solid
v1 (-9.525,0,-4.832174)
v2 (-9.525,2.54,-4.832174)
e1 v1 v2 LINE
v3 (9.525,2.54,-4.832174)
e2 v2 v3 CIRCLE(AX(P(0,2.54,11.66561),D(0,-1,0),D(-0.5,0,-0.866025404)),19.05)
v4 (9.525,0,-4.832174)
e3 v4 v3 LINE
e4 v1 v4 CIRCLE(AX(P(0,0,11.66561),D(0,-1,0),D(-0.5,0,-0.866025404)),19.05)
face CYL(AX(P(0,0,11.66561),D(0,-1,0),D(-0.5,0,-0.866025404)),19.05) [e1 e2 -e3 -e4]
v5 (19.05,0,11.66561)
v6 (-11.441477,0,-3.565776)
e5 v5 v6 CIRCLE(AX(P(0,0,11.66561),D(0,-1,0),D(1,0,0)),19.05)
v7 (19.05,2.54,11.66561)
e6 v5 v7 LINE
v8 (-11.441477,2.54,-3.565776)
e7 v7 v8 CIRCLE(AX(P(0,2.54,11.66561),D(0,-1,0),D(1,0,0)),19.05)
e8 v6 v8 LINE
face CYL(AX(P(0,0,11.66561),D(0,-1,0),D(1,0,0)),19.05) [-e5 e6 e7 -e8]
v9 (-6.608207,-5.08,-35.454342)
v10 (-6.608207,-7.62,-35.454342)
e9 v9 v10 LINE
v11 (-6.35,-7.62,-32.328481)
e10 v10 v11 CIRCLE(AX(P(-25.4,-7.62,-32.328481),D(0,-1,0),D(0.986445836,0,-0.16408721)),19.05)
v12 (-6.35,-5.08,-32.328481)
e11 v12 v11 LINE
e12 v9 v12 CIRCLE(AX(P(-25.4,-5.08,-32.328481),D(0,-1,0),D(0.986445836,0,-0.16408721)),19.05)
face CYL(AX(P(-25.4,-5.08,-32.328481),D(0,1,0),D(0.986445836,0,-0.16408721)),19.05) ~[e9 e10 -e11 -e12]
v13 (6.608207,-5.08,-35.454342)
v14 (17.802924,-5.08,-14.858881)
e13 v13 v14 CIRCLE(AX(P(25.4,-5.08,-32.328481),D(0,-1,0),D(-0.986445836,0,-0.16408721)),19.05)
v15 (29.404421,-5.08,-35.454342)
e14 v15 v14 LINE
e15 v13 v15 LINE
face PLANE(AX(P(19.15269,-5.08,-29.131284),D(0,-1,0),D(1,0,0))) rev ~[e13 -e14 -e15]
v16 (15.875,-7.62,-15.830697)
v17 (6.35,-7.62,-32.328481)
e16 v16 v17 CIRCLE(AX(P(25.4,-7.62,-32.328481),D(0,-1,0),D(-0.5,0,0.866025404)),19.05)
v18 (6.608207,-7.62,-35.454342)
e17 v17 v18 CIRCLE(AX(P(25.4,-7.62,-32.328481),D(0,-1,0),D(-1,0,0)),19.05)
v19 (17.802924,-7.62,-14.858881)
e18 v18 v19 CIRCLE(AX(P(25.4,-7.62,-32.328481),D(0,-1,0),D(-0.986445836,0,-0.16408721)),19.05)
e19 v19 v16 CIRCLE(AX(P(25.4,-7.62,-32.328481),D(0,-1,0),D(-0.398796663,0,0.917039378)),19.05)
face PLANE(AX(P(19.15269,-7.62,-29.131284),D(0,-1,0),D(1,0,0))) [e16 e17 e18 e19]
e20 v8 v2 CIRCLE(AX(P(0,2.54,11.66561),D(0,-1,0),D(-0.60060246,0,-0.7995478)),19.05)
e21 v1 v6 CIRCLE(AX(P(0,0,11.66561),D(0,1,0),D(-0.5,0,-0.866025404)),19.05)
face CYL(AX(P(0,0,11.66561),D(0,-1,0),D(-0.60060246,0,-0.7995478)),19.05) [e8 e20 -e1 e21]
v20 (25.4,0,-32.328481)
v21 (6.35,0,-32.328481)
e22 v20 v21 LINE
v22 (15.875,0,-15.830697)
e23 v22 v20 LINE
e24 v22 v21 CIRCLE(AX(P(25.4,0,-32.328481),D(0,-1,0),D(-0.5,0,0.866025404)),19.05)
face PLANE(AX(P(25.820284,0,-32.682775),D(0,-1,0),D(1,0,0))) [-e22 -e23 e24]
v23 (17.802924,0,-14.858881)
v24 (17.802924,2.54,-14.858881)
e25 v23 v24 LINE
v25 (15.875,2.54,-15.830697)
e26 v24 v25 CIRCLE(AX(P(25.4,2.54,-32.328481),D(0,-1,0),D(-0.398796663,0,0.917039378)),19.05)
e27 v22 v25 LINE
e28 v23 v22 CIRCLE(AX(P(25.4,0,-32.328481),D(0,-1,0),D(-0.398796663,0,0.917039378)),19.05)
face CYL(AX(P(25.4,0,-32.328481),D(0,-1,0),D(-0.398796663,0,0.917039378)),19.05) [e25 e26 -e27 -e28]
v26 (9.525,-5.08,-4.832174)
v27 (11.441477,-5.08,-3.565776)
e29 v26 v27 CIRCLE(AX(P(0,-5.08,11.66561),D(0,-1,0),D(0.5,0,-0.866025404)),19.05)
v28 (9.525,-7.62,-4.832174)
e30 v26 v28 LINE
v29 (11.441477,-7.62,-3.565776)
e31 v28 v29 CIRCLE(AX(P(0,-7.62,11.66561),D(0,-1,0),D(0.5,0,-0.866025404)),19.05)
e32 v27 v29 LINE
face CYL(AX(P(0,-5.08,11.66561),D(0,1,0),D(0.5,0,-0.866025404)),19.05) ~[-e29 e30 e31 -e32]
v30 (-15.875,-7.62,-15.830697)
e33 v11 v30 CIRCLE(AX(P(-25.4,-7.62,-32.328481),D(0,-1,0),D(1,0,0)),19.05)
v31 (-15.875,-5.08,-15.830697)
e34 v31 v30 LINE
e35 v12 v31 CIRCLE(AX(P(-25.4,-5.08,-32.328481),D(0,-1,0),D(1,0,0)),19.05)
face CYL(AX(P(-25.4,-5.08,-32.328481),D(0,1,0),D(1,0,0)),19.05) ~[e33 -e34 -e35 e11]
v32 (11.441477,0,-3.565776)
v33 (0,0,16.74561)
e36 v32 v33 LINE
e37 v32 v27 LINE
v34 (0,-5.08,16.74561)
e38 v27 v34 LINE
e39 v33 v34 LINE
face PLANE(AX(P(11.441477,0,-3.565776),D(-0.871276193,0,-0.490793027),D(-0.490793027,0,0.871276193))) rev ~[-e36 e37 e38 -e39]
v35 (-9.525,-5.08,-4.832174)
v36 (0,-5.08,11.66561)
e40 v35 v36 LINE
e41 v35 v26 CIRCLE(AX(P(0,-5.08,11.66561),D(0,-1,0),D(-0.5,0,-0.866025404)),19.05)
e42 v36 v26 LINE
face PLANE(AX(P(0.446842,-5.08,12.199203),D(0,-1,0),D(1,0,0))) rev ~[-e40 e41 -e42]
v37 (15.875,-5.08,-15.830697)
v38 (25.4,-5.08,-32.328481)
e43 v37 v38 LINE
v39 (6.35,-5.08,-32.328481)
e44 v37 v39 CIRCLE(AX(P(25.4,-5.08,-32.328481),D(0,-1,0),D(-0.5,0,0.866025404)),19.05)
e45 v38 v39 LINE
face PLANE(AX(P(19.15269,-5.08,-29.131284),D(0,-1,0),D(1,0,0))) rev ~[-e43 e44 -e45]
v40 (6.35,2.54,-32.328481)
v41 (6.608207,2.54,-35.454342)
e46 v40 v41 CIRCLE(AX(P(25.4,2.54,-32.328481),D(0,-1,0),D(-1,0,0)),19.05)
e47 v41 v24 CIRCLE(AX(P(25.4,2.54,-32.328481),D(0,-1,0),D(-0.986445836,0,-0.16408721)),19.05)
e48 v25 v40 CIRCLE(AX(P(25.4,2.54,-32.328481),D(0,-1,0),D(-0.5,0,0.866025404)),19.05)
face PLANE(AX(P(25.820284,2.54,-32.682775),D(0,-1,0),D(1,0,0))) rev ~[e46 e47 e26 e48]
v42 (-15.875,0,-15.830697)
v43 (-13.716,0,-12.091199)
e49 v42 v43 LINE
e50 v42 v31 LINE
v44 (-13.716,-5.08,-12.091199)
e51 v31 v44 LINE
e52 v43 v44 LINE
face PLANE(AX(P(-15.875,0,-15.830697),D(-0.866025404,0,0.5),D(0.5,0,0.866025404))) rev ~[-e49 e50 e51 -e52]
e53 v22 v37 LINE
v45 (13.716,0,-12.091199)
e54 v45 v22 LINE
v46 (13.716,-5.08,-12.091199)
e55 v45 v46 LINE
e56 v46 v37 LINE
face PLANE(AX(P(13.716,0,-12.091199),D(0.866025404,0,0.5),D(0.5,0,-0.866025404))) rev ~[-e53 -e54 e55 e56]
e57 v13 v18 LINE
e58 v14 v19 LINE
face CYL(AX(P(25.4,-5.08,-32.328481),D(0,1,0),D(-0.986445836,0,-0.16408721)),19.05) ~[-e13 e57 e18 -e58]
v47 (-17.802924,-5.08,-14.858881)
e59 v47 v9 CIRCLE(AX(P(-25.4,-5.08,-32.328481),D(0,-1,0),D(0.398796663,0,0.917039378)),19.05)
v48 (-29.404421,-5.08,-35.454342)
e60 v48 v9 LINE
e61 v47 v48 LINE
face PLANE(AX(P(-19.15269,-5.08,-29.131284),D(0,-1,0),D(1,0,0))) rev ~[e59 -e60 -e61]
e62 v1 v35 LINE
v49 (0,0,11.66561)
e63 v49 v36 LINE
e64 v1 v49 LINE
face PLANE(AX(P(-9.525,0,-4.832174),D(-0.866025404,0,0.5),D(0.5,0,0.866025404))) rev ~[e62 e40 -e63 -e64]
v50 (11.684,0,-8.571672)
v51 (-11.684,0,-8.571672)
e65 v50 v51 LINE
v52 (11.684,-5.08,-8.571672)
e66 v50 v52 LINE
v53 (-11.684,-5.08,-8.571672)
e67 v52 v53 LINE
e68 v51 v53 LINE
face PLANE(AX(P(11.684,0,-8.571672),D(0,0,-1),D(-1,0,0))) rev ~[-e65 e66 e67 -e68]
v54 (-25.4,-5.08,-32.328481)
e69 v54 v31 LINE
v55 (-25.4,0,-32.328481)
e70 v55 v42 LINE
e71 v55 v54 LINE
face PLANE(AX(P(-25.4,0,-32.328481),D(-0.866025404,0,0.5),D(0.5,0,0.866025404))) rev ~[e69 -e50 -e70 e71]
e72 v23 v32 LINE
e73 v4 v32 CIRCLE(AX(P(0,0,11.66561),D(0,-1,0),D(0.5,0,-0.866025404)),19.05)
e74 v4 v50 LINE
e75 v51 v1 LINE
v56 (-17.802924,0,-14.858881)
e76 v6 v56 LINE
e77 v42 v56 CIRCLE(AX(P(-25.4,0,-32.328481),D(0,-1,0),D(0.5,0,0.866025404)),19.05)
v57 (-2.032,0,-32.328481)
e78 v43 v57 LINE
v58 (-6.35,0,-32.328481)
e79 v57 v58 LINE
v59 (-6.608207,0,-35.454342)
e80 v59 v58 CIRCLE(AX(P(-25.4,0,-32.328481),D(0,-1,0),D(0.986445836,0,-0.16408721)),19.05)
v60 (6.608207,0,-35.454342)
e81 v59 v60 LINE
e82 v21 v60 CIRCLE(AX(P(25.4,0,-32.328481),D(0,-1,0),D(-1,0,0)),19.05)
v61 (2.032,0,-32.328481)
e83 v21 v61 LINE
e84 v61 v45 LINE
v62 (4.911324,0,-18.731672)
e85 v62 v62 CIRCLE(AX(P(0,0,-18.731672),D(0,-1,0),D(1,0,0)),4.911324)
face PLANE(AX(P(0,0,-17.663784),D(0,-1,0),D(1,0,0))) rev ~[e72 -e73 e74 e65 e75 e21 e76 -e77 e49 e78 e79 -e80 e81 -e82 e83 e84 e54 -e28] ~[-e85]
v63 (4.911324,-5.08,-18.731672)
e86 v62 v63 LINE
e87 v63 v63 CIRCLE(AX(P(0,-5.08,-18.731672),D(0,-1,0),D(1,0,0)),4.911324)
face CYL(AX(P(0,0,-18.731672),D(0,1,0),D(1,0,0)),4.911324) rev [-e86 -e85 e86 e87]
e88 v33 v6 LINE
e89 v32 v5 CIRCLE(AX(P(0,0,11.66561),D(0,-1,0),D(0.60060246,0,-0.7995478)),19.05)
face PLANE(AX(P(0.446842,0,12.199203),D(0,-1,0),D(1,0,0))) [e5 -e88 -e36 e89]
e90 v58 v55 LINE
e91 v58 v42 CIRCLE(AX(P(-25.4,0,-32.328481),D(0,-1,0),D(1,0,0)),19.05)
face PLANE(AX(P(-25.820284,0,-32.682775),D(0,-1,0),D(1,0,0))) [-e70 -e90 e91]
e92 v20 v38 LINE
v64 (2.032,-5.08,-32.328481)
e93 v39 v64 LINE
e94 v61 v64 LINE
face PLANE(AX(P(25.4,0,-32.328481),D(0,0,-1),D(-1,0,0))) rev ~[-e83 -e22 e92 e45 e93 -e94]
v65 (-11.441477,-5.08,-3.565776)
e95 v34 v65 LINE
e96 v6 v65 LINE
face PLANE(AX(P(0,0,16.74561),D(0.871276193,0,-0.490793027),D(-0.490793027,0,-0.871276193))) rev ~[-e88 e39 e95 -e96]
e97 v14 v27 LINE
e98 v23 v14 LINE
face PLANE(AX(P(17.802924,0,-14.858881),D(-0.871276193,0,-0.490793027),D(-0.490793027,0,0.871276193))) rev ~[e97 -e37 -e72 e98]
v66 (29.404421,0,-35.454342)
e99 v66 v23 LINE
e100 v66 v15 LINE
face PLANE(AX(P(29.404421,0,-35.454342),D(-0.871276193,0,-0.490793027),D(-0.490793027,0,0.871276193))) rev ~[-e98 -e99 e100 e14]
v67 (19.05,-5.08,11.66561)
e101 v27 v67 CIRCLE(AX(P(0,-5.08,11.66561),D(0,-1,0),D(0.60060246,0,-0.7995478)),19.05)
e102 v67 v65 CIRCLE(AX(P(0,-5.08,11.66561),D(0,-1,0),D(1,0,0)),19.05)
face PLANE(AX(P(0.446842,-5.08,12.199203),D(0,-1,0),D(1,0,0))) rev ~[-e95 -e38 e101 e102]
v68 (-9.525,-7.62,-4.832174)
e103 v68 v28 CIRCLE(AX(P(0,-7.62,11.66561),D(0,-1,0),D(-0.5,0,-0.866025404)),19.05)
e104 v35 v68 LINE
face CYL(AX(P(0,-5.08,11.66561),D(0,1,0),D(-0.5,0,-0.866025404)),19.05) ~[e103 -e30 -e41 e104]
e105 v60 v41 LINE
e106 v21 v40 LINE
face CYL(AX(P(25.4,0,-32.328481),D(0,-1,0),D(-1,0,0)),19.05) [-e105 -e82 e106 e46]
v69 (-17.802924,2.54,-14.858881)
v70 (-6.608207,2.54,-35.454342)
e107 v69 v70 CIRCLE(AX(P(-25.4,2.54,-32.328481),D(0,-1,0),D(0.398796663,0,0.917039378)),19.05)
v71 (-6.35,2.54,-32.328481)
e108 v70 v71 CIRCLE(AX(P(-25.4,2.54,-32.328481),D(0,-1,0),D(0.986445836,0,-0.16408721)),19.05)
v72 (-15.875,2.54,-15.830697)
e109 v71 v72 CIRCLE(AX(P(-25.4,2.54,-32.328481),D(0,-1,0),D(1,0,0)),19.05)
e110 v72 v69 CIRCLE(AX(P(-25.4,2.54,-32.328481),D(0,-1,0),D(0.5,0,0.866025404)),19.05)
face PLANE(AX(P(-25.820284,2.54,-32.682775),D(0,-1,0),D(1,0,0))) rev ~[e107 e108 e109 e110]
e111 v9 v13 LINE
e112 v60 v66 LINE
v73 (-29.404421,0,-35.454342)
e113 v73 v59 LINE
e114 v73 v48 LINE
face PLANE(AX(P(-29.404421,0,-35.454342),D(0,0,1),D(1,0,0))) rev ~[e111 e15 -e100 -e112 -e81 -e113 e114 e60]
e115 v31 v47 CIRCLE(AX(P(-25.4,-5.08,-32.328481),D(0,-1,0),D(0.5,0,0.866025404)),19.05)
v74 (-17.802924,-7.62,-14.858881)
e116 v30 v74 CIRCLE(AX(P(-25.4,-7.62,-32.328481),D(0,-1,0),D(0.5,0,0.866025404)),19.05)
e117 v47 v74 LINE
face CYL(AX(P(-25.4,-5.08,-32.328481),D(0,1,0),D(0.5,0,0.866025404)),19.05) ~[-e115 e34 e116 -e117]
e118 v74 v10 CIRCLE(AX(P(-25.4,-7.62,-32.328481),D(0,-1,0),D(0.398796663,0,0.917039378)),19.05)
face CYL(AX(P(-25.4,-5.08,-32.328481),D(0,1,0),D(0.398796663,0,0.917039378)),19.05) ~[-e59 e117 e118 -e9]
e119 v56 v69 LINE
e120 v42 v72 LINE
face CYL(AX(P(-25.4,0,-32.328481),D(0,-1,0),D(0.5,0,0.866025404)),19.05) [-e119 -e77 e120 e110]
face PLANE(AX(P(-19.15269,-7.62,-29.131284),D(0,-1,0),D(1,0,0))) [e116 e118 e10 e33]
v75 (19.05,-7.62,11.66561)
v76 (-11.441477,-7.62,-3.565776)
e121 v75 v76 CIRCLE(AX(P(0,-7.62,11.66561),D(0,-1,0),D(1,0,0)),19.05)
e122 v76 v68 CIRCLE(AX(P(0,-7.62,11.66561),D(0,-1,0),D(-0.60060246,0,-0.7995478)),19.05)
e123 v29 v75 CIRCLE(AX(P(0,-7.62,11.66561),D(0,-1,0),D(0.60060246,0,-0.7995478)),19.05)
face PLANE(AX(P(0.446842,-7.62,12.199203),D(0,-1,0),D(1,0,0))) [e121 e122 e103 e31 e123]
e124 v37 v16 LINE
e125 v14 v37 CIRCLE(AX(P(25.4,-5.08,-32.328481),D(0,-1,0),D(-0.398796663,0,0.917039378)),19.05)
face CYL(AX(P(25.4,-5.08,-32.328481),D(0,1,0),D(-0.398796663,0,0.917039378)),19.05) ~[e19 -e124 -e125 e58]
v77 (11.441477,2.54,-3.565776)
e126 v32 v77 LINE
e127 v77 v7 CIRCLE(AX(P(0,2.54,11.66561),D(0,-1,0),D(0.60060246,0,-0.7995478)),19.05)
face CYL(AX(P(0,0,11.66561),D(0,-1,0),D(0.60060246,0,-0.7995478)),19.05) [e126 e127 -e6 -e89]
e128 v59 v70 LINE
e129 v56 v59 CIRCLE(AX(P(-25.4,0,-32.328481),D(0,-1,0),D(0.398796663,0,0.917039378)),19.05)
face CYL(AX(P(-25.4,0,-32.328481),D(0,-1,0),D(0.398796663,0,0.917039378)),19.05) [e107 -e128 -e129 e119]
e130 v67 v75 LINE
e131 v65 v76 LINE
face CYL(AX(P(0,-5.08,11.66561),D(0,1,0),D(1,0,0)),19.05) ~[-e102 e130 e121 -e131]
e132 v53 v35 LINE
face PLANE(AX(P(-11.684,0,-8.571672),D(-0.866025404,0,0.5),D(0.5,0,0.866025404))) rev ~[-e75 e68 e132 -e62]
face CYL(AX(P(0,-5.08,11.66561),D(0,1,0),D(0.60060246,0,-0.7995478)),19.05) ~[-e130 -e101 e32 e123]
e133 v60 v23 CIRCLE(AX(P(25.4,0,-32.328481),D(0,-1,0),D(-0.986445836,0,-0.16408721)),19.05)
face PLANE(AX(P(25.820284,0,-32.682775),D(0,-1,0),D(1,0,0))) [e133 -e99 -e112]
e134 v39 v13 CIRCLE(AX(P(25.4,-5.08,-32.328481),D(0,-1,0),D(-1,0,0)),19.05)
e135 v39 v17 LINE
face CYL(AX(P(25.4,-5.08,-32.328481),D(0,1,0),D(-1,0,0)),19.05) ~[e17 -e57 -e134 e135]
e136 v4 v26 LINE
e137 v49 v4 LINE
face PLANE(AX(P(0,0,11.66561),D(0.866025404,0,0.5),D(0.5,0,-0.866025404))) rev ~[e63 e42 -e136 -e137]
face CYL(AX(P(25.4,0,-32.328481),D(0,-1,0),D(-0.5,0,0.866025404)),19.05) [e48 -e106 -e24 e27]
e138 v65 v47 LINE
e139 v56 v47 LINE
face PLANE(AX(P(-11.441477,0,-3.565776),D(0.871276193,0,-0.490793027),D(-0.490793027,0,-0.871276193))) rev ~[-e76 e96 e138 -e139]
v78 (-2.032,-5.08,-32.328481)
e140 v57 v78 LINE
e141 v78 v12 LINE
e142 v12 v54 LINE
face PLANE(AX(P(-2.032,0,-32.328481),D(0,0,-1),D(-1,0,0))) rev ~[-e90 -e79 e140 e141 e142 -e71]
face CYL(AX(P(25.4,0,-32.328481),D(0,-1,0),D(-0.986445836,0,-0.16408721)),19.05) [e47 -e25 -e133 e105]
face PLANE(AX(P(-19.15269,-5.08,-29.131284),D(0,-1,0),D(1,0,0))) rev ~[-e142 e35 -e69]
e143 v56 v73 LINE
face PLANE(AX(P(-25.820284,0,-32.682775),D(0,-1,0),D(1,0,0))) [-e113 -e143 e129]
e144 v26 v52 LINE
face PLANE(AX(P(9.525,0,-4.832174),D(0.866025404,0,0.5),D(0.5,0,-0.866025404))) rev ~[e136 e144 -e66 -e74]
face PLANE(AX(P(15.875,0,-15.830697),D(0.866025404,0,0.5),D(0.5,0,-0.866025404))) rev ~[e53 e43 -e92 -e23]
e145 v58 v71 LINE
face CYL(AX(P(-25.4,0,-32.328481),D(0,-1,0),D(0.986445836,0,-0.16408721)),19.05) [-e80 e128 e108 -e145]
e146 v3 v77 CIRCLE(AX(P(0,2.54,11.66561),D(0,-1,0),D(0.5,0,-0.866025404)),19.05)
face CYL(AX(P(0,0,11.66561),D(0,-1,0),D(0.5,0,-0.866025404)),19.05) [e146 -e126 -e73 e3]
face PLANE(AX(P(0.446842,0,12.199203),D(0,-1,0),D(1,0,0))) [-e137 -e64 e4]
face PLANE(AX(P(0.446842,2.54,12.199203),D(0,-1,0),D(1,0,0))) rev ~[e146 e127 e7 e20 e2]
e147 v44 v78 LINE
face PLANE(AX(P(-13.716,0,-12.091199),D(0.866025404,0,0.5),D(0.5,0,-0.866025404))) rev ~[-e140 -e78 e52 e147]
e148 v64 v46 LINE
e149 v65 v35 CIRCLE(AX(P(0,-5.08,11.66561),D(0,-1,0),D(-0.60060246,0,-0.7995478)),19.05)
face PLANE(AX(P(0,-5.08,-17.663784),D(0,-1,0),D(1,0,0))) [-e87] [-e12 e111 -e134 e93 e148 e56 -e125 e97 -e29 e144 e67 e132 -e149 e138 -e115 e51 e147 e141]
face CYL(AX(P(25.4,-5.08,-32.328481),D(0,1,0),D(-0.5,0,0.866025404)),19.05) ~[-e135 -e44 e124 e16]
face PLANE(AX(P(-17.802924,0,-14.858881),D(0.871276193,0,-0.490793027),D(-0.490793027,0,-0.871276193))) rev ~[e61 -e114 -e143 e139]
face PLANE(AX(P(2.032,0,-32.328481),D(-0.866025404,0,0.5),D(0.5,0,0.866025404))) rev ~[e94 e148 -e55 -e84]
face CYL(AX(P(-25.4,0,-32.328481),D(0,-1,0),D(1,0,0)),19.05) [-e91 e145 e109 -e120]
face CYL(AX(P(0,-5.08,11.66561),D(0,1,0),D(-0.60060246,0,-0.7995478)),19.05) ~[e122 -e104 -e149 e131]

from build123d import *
from build123d import SkipClean  # not in build123d's __all__

# Parameters (mm, degrees)
F0_R     = 4.9113239183
F1_DEPTH = 5.08
F2_DEPTH = 2.54
F4_DEPTH = 2.54
F5_DEPTH = 5.08


# Not quite as in the source:
# - a feature names something its author has since deleted; it is built from what else it names


with BuildPart() as f1:
    # F0 (on Front) → F1 (new body)
    with BuildSketch(Plane.XZ):
        Polygon((11.684, -8.5716721153), (-11.684, -8.5716721153), (-12.7, -10.3314357358), (-13.716, -12.0911993563), (-2.032, -32.3284809919), (0, -32.3284809919), (2.032, -32.3284809919), (13.716, -12.0911993563), (12.7, -10.3314357358), align=None)
        with Locations((0, -18.7316721153)):
            Circle(F0_R, mode=Mode.SUBTRACT)
        with BuildLine():
            ThreePointArc((-11.4414768653, -3.5657760746), (-10.5023439874, -4.227888231), (-9.525, -4.8321744218))
            Line((-9.525, -4.8321744218), (0, 11.6656095203))
            Line((0, 11.6656095203), (0, 16.7456095203))
            Line((0, 16.7456095203), (-11.4414768653, -3.5657760746))
        make_face()
        with BuildLine():
            Line((9.525, -4.8321744218), (11.684, -8.5716721153))
            Line((11.684, -8.5716721153), (12.7, -10.3314357358))
            Line((12.7, -10.3314357358), (13.716, -12.0911993563))
            Line((13.716, -12.0911993563), (15.875, -15.8306970498))
            ThreePointArc((15.875, -15.8306970498), (16.8251832643, -15.3174546282), (17.8029235649, -14.8588808351))
            Line((17.8029235649, -14.8588808351), (11.4414768653, -3.5657760746))
            ThreePointArc((11.4414768653, -3.5657760746), (10.5023439874, -4.227888231), (9.525, -4.8321744218))
        make_face()
        with BuildLine():
            Line((0, 16.7456095203), (0, 11.6656095203))
            Line((0, 11.6656095203), (9.525, -4.8321744218))
            ThreePointArc((9.525, -4.8321744218), (10.5023439874, -4.227888231), (11.4414768653, -3.5657760746))
            Line((11.4414768653, -3.5657760746), (0, 16.7456095203))
        make_face()
        with BuildLine():
            Line((-25.4, -32.3284809919), (-15.875, -15.8306970498))
            ThreePointArc((-15.875, -15.8306970498), (-16.8251832643, -15.3174546282), (-17.8029235649, -14.8588808351))
            Line((-17.8029235649, -14.8588808351), (-29.4044214139, -35.4543423357))
            Line((-29.4044214139, -35.4543423357), (-25.4, -32.3284809919))
        make_face()
        with BuildLine():
            Line((0, -32.3284809919), (-2.032, -32.3284809919))
            Line((-2.032, -32.3284809919), (-6.35, -32.3284809919))
            ThreePointArc((-6.35, -32.3284809919), (-6.4146614456, -33.8967347902), (-6.6082068216, -35.4543423357))
            Line((-6.6082068216, -35.4543423357), (6.6082068216, -35.4543423357))
            ThreePointArc((6.6082068216, -35.4543423357), (6.4146614456, -33.8967347902), (6.35, -32.3284809919))
            Line((6.35, -32.3284809919), (2.032, -32.3284809919))
            Line((2.032, -32.3284809919), (0, -32.3284809919))
        make_face()
        with BuildLine():
            Line((-6.35, -32.3284809919), (-25.4, -32.3284809919))
            Line((-25.4, -32.3284809919), (-29.4044214139, -35.4543423357))
            Line((-29.4044214139, -35.4543423357), (-6.6082068216, -35.4543423357))
            ThreePointArc((-6.6082068216, -35.4543423357), (-6.4146614456, -33.8967347902), (-6.35, -32.3284809919))
        make_face()
        with BuildLine():
            Line((29.4044214139, -35.4543423357), (17.8029235649, -14.8588808351))
            ThreePointArc((17.8029235649, -14.8588808351), (16.8251832643, -15.3174546282), (15.875, -15.8306970498))
            Line((15.875, -15.8306970498), (25.4, -32.3284809919))
            Line((25.4, -32.3284809919), (29.4044214139, -35.4543423357))
        make_face()
        with BuildLine():
            ThreePointArc((6.35, -32.3284809919), (6.4146614456, -33.8967347902), (6.6082068216, -35.4543423357))
            Line((6.6082068216, -35.4543423357), (29.4044214139, -35.4543423357))
            Line((29.4044214139, -35.4543423357), (25.4, -32.3284809919))
            Line((25.4, -32.3284809919), (6.35, -32.3284809919))
        make_face()
    extrude(amount=F1_DEPTH)

    # F0 (on Front) → F2 (join)
    with BuildSketch(Plane.XZ):
        with BuildLine():
            ThreePointArc((19.05, 11.6656095203), (-8.5130008139, 28.7076550883), (-11.4414768653, -3.5657760746))
            Line((-11.4414768653, -3.5657760746), (0, 16.7456095203))
            Line((0, 16.7456095203), (11.4414768653, -3.5657760746))
            ThreePointArc((11.4414768653, -3.5657760746), (17.042045568, 3.1526087064), (19.05, 11.6656095203))
        make_face()
        with BuildLine():
            Line((0, 11.6656095203), (-9.525, -4.8321744218))
            ThreePointArc((-9.525, -4.8321744218), (0, -7.3843904797), (9.525, -4.8321744218))
            Line((9.525, -4.8321744218), (0, 11.6656095203))
        make_face()
        with BuildLine():
            Line((-29.4044214139, -35.4543423357), (-17.8029235649, -14.8588808351))
            ThreePointArc((-17.8029235649, -14.8588808351), (-42.1372748222, -41.4260703169), (-6.6082068216, -35.4543423357))
            Line((-6.6082068216, -35.4543423357), (-29.4044214139, -35.4543423357))
        make_face()
        with BuildLine():
            ThreePointArc((-6.35, -32.3284809919), (-8.9022160579, -22.8034809919), (-15.875, -15.8306970498))
            Line((-15.875, -15.8306970498), (-25.4, -32.3284809919))
            Line((-25.4, -32.3284809919), (-6.35, -32.3284809919))
        make_face()
        with BuildLine():
            ThreePointArc((44.45, -32.3284809919), (35.8445726076, -16.3969586841), (17.8029235649, -14.8588808351))
            Line((17.8029235649, -14.8588808351), (29.4044214139, -35.4543423357))
            Line((29.4044214139, -35.4543423357), (6.6082068216, -35.4543423357))
            ThreePointArc((6.6082068216, -35.4543423357), (26.9682537983, -51.3138195463), (44.45, -32.3284809919))
        make_face()
        with BuildLine():
            Line((25.4, -32.3284809919), (15.875, -15.8306970498))
            ThreePointArc((15.875, -15.8306970498), (8.9022160579, -22.8034809919), (6.35, -32.3284809919))
            Line((6.35, -32.3284809919), (25.4, -32.3284809919))
        make_face()
        with BuildLine():
            Line((-6.35, -32.3284809919), (-25.4, -32.3284809919))
            Line((-25.4, -32.3284809919), (-29.4044214139, -35.4543423357))
            Line((-29.4044214139, -35.4543423357), (-6.6082068216, -35.4543423357))
            ThreePointArc((-6.6082068216, -35.4543423357), (-6.4146614456, -33.8967347902), (-6.35, -32.3284809919))
        make_face()
        with BuildLine():
            Line((-25.4, -32.3284809919), (-15.875, -15.8306970498))
            ThreePointArc((-15.875, -15.8306970498), (-16.8251832643, -15.3174546282), (-17.8029235649, -14.8588808351))
            Line((-17.8029235649, -14.8588808351), (-29.4044214139, -35.4543423357))
            Line((-29.4044214139, -35.4543423357), (-25.4, -32.3284809919))
        make_face()
        with BuildLine():
            ThreePointArc((6.35, -32.3284809919), (6.4146614456, -33.8967347902), (6.6082068216, -35.4543423357))
            Line((6.6082068216, -35.4543423357), (29.4044214139, -35.4543423357))
            Line((29.4044214139, -35.4543423357), (25.4, -32.3284809919))
            Line((25.4, -32.3284809919), (6.35, -32.3284809919))
        make_face()
        with BuildLine():
            Line((29.4044214139, -35.4543423357), (17.8029235649, -14.8588808351))
            ThreePointArc((17.8029235649, -14.8588808351), (16.8251832643, -15.3174546282), (15.875, -15.8306970498))
            Line((15.875, -15.8306970498), (25.4, -32.3284809919))
            Line((25.4, -32.3284809919), (29.4044214139, -35.4543423357))
        make_face()
        with BuildLine():
            Line((0, 16.7456095203), (0, 11.6656095203))
            Line((0, 11.6656095203), (9.525, -4.8321744218))
            ThreePointArc((9.525, -4.8321744218), (10.5023439874, -4.227888231), (11.4414768653, -3.5657760746))
            Line((11.4414768653, -3.5657760746), (0, 16.7456095203))
        make_face()
        with BuildLine():
            ThreePointArc((-11.4414768653, -3.5657760746), (-10.5023439874, -4.227888231), (-9.525, -4.8321744218))
            Line((-9.525, -4.8321744218), (0, 11.6656095203))
            Line((0, 11.6656095203), (0, 16.7456095203))
            Line((0, 16.7456095203), (-11.4414768653, -3.5657760746))
        make_face()
    extrude(amount=-F2_DEPTH)

    # F3 (on face) → F4 (join)
    with BuildSketch(Plane.XZ.offset(5.08)):
        with BuildLine():
            ThreePointArc((11.4414768653, -3.5657760746), (17.042045568, 3.1526087064), (19.05, 11.6656095203))
            ThreePointArc((19.05, 11.6656095203), (-8.5130008139, 28.7076550883), (-11.4414768653, -3.5657760746))
            Line((-11.4414768653, -3.5657760746), (0, 16.7456095203))
            Line((0, 16.7456095203), (11.4414768653, -3.5657760746))
        make_face()
        with BuildLine():
            Line((0, 16.7456095203), (-11.4414768653, -3.5657760746))
            ThreePointArc((-11.4414768653, -3.5657760746), (-10.5023439874, -4.227888231), (-9.525, -4.8321744218))
            Line((-9.525, -4.8321744218), (0, 11.6656095203))
            Line((0, 11.6656095203), (9.525, -4.8321744218))
            ThreePointArc((9.525, -4.8321744218), (10.5023439874, -4.227888231), (11.4414768653, -3.5657760746))
            Line((11.4414768653, -3.5657760746), (0, 16.7456095203))
        make_face()
        with BuildLine():
            Line((0, 11.6656095203), (-9.525, -4.8321744218))
            ThreePointArc((-9.525, -4.8321744218), (0, -7.3843904797), (9.525, -4.8321744218))
            Line((9.525, -4.8321744218), (0, 11.6656095203))
        make_face()
        with BuildLine():
            Line((29.4044214139, -35.4543423357), (17.8029235649, -14.8588808351))
            ThreePointArc((17.8029235649, -14.8588808351), (16.8251832643, -15.3174546282), (15.875, -15.8306970498))
            Line((15.875, -15.8306970498), (25.4, -32.3284809919))
            Line((25.4, -32.3284809919), (6.35, -32.3284809919))
            ThreePointArc((6.35, -32.3284809919), (6.4146614456, -33.8967347902), (6.6082068216, -35.4543423357))
            Line((6.6082068216, -35.4543423357), (29.4044214139, -35.4543423357))
        make_face()
        with BuildLine():
            ThreePointArc((44.45, -32.3284809919), (35.8445726076, -16.3969586841), (17.8029235649, -14.8588808351))
            Line((17.8029235649, -14.8588808351), (29.4044214139, -35.4543423357))
            Line((29.4044214139, -35.4543423357), (6.6082068216, -35.4543423357))
            ThreePointArc((6.6082068216, -35.4543423357), (26.9682537983, -51.3138195463), (44.45, -32.3284809919))
        make_face()
        with BuildLine():
            Line((25.4, -32.3284809919), (15.875, -15.8306970498))
            ThreePointArc((15.875, -15.8306970498), (8.9022160579, -22.8034809919), (6.35, -32.3284809919))
            Line((6.35, -32.3284809919), (25.4, -32.3284809919))
        make_face()
        with BuildLine():
            Line((-29.4044214139, -35.4543423357), (-6.6082068216, -35.4543423357))
            ThreePointArc((-6.6082068216, -35.4543423357), (-6.4146614456, -33.8967347902), (-6.35, -32.3284809919))
            Line((-6.35, -32.3284809919), (-25.4, -32.3284809919))
            Line((-25.4, -32.3284809919), (-15.875, -15.8306970498))
            ThreePointArc((-15.875, -15.8306970498), (-16.8251832643, -15.3174546282), (-17.8029235649, -14.8588808351))
            Line((-17.8029235649, -14.8588808351), (-29.4044214139, -35.4543423357))
        make_face()
        with BuildLine():
            ThreePointArc((-17.8029235649, -14.8588808351), (-42.1372748222, -41.4260703169), (-6.6082068216, -35.4543423357))
            Line((-6.6082068216, -35.4543423357), (-29.4044214139, -35.4543423357))
            Line((-29.4044214139, -35.4543423357), (-17.8029235649, -14.8588808351))
        make_face()
        with BuildLine():
            Line((-25.4, -32.3284809919), (-6.35, -32.3284809919))
            ThreePointArc((-6.35, -32.3284809919), (-8.9022160579, -22.8034809919), (-15.875, -15.8306970498))
            Line((-15.875, -15.8306970498), (-25.4, -32.3284809919))
        make_face()
    with SkipClean():  # cleaning this boolean's faces spoils the solid; the shape is the same uncleaned
        extrude(amount=F4_DEPTH)

    # F0 (on Front) → F5 (join)
    with BuildSketch(Plane.XZ):
        Polygon((11.684, -8.5716721153), (-11.684, -8.5716721153), (-12.7, -10.3314357358), (-13.716, -12.0911993563), (-2.032, -32.3284809919), (0, -32.3284809919), (2.032, -32.3284809919), (13.716, -12.0911993563), (12.7, -10.3314357358), align=None)
        with Locations((0, -18.7316721153)):
            Circle(F0_R, mode=Mode.SUBTRACT)
        with BuildLine():
            Line((-12.7, -10.3314357358), (-11.684, -8.5716721153))
            Line((-11.684, -8.5716721153), (-9.525, -4.8321744218))
            ThreePointArc((-9.525, -4.8321744218), (-10.5023439874, -4.227888231), (-11.4414768653, -3.5657760746))
            Line((-11.4414768653, -3.5657760746), (-17.8029235649, -14.8588808351))
            ThreePointArc((-17.8029235649, -14.8588808351), (-16.8251832643, -15.3174546282), (-15.875, -15.8306970498))
            Line((-15.875, -15.8306970498), (-13.716, -12.0911993563))
            Line((-13.716, -12.0911993563), (-12.7, -10.3314357358))
        make_face()
    extrude(amount=F5_DEPTH)


solid = f1.part
